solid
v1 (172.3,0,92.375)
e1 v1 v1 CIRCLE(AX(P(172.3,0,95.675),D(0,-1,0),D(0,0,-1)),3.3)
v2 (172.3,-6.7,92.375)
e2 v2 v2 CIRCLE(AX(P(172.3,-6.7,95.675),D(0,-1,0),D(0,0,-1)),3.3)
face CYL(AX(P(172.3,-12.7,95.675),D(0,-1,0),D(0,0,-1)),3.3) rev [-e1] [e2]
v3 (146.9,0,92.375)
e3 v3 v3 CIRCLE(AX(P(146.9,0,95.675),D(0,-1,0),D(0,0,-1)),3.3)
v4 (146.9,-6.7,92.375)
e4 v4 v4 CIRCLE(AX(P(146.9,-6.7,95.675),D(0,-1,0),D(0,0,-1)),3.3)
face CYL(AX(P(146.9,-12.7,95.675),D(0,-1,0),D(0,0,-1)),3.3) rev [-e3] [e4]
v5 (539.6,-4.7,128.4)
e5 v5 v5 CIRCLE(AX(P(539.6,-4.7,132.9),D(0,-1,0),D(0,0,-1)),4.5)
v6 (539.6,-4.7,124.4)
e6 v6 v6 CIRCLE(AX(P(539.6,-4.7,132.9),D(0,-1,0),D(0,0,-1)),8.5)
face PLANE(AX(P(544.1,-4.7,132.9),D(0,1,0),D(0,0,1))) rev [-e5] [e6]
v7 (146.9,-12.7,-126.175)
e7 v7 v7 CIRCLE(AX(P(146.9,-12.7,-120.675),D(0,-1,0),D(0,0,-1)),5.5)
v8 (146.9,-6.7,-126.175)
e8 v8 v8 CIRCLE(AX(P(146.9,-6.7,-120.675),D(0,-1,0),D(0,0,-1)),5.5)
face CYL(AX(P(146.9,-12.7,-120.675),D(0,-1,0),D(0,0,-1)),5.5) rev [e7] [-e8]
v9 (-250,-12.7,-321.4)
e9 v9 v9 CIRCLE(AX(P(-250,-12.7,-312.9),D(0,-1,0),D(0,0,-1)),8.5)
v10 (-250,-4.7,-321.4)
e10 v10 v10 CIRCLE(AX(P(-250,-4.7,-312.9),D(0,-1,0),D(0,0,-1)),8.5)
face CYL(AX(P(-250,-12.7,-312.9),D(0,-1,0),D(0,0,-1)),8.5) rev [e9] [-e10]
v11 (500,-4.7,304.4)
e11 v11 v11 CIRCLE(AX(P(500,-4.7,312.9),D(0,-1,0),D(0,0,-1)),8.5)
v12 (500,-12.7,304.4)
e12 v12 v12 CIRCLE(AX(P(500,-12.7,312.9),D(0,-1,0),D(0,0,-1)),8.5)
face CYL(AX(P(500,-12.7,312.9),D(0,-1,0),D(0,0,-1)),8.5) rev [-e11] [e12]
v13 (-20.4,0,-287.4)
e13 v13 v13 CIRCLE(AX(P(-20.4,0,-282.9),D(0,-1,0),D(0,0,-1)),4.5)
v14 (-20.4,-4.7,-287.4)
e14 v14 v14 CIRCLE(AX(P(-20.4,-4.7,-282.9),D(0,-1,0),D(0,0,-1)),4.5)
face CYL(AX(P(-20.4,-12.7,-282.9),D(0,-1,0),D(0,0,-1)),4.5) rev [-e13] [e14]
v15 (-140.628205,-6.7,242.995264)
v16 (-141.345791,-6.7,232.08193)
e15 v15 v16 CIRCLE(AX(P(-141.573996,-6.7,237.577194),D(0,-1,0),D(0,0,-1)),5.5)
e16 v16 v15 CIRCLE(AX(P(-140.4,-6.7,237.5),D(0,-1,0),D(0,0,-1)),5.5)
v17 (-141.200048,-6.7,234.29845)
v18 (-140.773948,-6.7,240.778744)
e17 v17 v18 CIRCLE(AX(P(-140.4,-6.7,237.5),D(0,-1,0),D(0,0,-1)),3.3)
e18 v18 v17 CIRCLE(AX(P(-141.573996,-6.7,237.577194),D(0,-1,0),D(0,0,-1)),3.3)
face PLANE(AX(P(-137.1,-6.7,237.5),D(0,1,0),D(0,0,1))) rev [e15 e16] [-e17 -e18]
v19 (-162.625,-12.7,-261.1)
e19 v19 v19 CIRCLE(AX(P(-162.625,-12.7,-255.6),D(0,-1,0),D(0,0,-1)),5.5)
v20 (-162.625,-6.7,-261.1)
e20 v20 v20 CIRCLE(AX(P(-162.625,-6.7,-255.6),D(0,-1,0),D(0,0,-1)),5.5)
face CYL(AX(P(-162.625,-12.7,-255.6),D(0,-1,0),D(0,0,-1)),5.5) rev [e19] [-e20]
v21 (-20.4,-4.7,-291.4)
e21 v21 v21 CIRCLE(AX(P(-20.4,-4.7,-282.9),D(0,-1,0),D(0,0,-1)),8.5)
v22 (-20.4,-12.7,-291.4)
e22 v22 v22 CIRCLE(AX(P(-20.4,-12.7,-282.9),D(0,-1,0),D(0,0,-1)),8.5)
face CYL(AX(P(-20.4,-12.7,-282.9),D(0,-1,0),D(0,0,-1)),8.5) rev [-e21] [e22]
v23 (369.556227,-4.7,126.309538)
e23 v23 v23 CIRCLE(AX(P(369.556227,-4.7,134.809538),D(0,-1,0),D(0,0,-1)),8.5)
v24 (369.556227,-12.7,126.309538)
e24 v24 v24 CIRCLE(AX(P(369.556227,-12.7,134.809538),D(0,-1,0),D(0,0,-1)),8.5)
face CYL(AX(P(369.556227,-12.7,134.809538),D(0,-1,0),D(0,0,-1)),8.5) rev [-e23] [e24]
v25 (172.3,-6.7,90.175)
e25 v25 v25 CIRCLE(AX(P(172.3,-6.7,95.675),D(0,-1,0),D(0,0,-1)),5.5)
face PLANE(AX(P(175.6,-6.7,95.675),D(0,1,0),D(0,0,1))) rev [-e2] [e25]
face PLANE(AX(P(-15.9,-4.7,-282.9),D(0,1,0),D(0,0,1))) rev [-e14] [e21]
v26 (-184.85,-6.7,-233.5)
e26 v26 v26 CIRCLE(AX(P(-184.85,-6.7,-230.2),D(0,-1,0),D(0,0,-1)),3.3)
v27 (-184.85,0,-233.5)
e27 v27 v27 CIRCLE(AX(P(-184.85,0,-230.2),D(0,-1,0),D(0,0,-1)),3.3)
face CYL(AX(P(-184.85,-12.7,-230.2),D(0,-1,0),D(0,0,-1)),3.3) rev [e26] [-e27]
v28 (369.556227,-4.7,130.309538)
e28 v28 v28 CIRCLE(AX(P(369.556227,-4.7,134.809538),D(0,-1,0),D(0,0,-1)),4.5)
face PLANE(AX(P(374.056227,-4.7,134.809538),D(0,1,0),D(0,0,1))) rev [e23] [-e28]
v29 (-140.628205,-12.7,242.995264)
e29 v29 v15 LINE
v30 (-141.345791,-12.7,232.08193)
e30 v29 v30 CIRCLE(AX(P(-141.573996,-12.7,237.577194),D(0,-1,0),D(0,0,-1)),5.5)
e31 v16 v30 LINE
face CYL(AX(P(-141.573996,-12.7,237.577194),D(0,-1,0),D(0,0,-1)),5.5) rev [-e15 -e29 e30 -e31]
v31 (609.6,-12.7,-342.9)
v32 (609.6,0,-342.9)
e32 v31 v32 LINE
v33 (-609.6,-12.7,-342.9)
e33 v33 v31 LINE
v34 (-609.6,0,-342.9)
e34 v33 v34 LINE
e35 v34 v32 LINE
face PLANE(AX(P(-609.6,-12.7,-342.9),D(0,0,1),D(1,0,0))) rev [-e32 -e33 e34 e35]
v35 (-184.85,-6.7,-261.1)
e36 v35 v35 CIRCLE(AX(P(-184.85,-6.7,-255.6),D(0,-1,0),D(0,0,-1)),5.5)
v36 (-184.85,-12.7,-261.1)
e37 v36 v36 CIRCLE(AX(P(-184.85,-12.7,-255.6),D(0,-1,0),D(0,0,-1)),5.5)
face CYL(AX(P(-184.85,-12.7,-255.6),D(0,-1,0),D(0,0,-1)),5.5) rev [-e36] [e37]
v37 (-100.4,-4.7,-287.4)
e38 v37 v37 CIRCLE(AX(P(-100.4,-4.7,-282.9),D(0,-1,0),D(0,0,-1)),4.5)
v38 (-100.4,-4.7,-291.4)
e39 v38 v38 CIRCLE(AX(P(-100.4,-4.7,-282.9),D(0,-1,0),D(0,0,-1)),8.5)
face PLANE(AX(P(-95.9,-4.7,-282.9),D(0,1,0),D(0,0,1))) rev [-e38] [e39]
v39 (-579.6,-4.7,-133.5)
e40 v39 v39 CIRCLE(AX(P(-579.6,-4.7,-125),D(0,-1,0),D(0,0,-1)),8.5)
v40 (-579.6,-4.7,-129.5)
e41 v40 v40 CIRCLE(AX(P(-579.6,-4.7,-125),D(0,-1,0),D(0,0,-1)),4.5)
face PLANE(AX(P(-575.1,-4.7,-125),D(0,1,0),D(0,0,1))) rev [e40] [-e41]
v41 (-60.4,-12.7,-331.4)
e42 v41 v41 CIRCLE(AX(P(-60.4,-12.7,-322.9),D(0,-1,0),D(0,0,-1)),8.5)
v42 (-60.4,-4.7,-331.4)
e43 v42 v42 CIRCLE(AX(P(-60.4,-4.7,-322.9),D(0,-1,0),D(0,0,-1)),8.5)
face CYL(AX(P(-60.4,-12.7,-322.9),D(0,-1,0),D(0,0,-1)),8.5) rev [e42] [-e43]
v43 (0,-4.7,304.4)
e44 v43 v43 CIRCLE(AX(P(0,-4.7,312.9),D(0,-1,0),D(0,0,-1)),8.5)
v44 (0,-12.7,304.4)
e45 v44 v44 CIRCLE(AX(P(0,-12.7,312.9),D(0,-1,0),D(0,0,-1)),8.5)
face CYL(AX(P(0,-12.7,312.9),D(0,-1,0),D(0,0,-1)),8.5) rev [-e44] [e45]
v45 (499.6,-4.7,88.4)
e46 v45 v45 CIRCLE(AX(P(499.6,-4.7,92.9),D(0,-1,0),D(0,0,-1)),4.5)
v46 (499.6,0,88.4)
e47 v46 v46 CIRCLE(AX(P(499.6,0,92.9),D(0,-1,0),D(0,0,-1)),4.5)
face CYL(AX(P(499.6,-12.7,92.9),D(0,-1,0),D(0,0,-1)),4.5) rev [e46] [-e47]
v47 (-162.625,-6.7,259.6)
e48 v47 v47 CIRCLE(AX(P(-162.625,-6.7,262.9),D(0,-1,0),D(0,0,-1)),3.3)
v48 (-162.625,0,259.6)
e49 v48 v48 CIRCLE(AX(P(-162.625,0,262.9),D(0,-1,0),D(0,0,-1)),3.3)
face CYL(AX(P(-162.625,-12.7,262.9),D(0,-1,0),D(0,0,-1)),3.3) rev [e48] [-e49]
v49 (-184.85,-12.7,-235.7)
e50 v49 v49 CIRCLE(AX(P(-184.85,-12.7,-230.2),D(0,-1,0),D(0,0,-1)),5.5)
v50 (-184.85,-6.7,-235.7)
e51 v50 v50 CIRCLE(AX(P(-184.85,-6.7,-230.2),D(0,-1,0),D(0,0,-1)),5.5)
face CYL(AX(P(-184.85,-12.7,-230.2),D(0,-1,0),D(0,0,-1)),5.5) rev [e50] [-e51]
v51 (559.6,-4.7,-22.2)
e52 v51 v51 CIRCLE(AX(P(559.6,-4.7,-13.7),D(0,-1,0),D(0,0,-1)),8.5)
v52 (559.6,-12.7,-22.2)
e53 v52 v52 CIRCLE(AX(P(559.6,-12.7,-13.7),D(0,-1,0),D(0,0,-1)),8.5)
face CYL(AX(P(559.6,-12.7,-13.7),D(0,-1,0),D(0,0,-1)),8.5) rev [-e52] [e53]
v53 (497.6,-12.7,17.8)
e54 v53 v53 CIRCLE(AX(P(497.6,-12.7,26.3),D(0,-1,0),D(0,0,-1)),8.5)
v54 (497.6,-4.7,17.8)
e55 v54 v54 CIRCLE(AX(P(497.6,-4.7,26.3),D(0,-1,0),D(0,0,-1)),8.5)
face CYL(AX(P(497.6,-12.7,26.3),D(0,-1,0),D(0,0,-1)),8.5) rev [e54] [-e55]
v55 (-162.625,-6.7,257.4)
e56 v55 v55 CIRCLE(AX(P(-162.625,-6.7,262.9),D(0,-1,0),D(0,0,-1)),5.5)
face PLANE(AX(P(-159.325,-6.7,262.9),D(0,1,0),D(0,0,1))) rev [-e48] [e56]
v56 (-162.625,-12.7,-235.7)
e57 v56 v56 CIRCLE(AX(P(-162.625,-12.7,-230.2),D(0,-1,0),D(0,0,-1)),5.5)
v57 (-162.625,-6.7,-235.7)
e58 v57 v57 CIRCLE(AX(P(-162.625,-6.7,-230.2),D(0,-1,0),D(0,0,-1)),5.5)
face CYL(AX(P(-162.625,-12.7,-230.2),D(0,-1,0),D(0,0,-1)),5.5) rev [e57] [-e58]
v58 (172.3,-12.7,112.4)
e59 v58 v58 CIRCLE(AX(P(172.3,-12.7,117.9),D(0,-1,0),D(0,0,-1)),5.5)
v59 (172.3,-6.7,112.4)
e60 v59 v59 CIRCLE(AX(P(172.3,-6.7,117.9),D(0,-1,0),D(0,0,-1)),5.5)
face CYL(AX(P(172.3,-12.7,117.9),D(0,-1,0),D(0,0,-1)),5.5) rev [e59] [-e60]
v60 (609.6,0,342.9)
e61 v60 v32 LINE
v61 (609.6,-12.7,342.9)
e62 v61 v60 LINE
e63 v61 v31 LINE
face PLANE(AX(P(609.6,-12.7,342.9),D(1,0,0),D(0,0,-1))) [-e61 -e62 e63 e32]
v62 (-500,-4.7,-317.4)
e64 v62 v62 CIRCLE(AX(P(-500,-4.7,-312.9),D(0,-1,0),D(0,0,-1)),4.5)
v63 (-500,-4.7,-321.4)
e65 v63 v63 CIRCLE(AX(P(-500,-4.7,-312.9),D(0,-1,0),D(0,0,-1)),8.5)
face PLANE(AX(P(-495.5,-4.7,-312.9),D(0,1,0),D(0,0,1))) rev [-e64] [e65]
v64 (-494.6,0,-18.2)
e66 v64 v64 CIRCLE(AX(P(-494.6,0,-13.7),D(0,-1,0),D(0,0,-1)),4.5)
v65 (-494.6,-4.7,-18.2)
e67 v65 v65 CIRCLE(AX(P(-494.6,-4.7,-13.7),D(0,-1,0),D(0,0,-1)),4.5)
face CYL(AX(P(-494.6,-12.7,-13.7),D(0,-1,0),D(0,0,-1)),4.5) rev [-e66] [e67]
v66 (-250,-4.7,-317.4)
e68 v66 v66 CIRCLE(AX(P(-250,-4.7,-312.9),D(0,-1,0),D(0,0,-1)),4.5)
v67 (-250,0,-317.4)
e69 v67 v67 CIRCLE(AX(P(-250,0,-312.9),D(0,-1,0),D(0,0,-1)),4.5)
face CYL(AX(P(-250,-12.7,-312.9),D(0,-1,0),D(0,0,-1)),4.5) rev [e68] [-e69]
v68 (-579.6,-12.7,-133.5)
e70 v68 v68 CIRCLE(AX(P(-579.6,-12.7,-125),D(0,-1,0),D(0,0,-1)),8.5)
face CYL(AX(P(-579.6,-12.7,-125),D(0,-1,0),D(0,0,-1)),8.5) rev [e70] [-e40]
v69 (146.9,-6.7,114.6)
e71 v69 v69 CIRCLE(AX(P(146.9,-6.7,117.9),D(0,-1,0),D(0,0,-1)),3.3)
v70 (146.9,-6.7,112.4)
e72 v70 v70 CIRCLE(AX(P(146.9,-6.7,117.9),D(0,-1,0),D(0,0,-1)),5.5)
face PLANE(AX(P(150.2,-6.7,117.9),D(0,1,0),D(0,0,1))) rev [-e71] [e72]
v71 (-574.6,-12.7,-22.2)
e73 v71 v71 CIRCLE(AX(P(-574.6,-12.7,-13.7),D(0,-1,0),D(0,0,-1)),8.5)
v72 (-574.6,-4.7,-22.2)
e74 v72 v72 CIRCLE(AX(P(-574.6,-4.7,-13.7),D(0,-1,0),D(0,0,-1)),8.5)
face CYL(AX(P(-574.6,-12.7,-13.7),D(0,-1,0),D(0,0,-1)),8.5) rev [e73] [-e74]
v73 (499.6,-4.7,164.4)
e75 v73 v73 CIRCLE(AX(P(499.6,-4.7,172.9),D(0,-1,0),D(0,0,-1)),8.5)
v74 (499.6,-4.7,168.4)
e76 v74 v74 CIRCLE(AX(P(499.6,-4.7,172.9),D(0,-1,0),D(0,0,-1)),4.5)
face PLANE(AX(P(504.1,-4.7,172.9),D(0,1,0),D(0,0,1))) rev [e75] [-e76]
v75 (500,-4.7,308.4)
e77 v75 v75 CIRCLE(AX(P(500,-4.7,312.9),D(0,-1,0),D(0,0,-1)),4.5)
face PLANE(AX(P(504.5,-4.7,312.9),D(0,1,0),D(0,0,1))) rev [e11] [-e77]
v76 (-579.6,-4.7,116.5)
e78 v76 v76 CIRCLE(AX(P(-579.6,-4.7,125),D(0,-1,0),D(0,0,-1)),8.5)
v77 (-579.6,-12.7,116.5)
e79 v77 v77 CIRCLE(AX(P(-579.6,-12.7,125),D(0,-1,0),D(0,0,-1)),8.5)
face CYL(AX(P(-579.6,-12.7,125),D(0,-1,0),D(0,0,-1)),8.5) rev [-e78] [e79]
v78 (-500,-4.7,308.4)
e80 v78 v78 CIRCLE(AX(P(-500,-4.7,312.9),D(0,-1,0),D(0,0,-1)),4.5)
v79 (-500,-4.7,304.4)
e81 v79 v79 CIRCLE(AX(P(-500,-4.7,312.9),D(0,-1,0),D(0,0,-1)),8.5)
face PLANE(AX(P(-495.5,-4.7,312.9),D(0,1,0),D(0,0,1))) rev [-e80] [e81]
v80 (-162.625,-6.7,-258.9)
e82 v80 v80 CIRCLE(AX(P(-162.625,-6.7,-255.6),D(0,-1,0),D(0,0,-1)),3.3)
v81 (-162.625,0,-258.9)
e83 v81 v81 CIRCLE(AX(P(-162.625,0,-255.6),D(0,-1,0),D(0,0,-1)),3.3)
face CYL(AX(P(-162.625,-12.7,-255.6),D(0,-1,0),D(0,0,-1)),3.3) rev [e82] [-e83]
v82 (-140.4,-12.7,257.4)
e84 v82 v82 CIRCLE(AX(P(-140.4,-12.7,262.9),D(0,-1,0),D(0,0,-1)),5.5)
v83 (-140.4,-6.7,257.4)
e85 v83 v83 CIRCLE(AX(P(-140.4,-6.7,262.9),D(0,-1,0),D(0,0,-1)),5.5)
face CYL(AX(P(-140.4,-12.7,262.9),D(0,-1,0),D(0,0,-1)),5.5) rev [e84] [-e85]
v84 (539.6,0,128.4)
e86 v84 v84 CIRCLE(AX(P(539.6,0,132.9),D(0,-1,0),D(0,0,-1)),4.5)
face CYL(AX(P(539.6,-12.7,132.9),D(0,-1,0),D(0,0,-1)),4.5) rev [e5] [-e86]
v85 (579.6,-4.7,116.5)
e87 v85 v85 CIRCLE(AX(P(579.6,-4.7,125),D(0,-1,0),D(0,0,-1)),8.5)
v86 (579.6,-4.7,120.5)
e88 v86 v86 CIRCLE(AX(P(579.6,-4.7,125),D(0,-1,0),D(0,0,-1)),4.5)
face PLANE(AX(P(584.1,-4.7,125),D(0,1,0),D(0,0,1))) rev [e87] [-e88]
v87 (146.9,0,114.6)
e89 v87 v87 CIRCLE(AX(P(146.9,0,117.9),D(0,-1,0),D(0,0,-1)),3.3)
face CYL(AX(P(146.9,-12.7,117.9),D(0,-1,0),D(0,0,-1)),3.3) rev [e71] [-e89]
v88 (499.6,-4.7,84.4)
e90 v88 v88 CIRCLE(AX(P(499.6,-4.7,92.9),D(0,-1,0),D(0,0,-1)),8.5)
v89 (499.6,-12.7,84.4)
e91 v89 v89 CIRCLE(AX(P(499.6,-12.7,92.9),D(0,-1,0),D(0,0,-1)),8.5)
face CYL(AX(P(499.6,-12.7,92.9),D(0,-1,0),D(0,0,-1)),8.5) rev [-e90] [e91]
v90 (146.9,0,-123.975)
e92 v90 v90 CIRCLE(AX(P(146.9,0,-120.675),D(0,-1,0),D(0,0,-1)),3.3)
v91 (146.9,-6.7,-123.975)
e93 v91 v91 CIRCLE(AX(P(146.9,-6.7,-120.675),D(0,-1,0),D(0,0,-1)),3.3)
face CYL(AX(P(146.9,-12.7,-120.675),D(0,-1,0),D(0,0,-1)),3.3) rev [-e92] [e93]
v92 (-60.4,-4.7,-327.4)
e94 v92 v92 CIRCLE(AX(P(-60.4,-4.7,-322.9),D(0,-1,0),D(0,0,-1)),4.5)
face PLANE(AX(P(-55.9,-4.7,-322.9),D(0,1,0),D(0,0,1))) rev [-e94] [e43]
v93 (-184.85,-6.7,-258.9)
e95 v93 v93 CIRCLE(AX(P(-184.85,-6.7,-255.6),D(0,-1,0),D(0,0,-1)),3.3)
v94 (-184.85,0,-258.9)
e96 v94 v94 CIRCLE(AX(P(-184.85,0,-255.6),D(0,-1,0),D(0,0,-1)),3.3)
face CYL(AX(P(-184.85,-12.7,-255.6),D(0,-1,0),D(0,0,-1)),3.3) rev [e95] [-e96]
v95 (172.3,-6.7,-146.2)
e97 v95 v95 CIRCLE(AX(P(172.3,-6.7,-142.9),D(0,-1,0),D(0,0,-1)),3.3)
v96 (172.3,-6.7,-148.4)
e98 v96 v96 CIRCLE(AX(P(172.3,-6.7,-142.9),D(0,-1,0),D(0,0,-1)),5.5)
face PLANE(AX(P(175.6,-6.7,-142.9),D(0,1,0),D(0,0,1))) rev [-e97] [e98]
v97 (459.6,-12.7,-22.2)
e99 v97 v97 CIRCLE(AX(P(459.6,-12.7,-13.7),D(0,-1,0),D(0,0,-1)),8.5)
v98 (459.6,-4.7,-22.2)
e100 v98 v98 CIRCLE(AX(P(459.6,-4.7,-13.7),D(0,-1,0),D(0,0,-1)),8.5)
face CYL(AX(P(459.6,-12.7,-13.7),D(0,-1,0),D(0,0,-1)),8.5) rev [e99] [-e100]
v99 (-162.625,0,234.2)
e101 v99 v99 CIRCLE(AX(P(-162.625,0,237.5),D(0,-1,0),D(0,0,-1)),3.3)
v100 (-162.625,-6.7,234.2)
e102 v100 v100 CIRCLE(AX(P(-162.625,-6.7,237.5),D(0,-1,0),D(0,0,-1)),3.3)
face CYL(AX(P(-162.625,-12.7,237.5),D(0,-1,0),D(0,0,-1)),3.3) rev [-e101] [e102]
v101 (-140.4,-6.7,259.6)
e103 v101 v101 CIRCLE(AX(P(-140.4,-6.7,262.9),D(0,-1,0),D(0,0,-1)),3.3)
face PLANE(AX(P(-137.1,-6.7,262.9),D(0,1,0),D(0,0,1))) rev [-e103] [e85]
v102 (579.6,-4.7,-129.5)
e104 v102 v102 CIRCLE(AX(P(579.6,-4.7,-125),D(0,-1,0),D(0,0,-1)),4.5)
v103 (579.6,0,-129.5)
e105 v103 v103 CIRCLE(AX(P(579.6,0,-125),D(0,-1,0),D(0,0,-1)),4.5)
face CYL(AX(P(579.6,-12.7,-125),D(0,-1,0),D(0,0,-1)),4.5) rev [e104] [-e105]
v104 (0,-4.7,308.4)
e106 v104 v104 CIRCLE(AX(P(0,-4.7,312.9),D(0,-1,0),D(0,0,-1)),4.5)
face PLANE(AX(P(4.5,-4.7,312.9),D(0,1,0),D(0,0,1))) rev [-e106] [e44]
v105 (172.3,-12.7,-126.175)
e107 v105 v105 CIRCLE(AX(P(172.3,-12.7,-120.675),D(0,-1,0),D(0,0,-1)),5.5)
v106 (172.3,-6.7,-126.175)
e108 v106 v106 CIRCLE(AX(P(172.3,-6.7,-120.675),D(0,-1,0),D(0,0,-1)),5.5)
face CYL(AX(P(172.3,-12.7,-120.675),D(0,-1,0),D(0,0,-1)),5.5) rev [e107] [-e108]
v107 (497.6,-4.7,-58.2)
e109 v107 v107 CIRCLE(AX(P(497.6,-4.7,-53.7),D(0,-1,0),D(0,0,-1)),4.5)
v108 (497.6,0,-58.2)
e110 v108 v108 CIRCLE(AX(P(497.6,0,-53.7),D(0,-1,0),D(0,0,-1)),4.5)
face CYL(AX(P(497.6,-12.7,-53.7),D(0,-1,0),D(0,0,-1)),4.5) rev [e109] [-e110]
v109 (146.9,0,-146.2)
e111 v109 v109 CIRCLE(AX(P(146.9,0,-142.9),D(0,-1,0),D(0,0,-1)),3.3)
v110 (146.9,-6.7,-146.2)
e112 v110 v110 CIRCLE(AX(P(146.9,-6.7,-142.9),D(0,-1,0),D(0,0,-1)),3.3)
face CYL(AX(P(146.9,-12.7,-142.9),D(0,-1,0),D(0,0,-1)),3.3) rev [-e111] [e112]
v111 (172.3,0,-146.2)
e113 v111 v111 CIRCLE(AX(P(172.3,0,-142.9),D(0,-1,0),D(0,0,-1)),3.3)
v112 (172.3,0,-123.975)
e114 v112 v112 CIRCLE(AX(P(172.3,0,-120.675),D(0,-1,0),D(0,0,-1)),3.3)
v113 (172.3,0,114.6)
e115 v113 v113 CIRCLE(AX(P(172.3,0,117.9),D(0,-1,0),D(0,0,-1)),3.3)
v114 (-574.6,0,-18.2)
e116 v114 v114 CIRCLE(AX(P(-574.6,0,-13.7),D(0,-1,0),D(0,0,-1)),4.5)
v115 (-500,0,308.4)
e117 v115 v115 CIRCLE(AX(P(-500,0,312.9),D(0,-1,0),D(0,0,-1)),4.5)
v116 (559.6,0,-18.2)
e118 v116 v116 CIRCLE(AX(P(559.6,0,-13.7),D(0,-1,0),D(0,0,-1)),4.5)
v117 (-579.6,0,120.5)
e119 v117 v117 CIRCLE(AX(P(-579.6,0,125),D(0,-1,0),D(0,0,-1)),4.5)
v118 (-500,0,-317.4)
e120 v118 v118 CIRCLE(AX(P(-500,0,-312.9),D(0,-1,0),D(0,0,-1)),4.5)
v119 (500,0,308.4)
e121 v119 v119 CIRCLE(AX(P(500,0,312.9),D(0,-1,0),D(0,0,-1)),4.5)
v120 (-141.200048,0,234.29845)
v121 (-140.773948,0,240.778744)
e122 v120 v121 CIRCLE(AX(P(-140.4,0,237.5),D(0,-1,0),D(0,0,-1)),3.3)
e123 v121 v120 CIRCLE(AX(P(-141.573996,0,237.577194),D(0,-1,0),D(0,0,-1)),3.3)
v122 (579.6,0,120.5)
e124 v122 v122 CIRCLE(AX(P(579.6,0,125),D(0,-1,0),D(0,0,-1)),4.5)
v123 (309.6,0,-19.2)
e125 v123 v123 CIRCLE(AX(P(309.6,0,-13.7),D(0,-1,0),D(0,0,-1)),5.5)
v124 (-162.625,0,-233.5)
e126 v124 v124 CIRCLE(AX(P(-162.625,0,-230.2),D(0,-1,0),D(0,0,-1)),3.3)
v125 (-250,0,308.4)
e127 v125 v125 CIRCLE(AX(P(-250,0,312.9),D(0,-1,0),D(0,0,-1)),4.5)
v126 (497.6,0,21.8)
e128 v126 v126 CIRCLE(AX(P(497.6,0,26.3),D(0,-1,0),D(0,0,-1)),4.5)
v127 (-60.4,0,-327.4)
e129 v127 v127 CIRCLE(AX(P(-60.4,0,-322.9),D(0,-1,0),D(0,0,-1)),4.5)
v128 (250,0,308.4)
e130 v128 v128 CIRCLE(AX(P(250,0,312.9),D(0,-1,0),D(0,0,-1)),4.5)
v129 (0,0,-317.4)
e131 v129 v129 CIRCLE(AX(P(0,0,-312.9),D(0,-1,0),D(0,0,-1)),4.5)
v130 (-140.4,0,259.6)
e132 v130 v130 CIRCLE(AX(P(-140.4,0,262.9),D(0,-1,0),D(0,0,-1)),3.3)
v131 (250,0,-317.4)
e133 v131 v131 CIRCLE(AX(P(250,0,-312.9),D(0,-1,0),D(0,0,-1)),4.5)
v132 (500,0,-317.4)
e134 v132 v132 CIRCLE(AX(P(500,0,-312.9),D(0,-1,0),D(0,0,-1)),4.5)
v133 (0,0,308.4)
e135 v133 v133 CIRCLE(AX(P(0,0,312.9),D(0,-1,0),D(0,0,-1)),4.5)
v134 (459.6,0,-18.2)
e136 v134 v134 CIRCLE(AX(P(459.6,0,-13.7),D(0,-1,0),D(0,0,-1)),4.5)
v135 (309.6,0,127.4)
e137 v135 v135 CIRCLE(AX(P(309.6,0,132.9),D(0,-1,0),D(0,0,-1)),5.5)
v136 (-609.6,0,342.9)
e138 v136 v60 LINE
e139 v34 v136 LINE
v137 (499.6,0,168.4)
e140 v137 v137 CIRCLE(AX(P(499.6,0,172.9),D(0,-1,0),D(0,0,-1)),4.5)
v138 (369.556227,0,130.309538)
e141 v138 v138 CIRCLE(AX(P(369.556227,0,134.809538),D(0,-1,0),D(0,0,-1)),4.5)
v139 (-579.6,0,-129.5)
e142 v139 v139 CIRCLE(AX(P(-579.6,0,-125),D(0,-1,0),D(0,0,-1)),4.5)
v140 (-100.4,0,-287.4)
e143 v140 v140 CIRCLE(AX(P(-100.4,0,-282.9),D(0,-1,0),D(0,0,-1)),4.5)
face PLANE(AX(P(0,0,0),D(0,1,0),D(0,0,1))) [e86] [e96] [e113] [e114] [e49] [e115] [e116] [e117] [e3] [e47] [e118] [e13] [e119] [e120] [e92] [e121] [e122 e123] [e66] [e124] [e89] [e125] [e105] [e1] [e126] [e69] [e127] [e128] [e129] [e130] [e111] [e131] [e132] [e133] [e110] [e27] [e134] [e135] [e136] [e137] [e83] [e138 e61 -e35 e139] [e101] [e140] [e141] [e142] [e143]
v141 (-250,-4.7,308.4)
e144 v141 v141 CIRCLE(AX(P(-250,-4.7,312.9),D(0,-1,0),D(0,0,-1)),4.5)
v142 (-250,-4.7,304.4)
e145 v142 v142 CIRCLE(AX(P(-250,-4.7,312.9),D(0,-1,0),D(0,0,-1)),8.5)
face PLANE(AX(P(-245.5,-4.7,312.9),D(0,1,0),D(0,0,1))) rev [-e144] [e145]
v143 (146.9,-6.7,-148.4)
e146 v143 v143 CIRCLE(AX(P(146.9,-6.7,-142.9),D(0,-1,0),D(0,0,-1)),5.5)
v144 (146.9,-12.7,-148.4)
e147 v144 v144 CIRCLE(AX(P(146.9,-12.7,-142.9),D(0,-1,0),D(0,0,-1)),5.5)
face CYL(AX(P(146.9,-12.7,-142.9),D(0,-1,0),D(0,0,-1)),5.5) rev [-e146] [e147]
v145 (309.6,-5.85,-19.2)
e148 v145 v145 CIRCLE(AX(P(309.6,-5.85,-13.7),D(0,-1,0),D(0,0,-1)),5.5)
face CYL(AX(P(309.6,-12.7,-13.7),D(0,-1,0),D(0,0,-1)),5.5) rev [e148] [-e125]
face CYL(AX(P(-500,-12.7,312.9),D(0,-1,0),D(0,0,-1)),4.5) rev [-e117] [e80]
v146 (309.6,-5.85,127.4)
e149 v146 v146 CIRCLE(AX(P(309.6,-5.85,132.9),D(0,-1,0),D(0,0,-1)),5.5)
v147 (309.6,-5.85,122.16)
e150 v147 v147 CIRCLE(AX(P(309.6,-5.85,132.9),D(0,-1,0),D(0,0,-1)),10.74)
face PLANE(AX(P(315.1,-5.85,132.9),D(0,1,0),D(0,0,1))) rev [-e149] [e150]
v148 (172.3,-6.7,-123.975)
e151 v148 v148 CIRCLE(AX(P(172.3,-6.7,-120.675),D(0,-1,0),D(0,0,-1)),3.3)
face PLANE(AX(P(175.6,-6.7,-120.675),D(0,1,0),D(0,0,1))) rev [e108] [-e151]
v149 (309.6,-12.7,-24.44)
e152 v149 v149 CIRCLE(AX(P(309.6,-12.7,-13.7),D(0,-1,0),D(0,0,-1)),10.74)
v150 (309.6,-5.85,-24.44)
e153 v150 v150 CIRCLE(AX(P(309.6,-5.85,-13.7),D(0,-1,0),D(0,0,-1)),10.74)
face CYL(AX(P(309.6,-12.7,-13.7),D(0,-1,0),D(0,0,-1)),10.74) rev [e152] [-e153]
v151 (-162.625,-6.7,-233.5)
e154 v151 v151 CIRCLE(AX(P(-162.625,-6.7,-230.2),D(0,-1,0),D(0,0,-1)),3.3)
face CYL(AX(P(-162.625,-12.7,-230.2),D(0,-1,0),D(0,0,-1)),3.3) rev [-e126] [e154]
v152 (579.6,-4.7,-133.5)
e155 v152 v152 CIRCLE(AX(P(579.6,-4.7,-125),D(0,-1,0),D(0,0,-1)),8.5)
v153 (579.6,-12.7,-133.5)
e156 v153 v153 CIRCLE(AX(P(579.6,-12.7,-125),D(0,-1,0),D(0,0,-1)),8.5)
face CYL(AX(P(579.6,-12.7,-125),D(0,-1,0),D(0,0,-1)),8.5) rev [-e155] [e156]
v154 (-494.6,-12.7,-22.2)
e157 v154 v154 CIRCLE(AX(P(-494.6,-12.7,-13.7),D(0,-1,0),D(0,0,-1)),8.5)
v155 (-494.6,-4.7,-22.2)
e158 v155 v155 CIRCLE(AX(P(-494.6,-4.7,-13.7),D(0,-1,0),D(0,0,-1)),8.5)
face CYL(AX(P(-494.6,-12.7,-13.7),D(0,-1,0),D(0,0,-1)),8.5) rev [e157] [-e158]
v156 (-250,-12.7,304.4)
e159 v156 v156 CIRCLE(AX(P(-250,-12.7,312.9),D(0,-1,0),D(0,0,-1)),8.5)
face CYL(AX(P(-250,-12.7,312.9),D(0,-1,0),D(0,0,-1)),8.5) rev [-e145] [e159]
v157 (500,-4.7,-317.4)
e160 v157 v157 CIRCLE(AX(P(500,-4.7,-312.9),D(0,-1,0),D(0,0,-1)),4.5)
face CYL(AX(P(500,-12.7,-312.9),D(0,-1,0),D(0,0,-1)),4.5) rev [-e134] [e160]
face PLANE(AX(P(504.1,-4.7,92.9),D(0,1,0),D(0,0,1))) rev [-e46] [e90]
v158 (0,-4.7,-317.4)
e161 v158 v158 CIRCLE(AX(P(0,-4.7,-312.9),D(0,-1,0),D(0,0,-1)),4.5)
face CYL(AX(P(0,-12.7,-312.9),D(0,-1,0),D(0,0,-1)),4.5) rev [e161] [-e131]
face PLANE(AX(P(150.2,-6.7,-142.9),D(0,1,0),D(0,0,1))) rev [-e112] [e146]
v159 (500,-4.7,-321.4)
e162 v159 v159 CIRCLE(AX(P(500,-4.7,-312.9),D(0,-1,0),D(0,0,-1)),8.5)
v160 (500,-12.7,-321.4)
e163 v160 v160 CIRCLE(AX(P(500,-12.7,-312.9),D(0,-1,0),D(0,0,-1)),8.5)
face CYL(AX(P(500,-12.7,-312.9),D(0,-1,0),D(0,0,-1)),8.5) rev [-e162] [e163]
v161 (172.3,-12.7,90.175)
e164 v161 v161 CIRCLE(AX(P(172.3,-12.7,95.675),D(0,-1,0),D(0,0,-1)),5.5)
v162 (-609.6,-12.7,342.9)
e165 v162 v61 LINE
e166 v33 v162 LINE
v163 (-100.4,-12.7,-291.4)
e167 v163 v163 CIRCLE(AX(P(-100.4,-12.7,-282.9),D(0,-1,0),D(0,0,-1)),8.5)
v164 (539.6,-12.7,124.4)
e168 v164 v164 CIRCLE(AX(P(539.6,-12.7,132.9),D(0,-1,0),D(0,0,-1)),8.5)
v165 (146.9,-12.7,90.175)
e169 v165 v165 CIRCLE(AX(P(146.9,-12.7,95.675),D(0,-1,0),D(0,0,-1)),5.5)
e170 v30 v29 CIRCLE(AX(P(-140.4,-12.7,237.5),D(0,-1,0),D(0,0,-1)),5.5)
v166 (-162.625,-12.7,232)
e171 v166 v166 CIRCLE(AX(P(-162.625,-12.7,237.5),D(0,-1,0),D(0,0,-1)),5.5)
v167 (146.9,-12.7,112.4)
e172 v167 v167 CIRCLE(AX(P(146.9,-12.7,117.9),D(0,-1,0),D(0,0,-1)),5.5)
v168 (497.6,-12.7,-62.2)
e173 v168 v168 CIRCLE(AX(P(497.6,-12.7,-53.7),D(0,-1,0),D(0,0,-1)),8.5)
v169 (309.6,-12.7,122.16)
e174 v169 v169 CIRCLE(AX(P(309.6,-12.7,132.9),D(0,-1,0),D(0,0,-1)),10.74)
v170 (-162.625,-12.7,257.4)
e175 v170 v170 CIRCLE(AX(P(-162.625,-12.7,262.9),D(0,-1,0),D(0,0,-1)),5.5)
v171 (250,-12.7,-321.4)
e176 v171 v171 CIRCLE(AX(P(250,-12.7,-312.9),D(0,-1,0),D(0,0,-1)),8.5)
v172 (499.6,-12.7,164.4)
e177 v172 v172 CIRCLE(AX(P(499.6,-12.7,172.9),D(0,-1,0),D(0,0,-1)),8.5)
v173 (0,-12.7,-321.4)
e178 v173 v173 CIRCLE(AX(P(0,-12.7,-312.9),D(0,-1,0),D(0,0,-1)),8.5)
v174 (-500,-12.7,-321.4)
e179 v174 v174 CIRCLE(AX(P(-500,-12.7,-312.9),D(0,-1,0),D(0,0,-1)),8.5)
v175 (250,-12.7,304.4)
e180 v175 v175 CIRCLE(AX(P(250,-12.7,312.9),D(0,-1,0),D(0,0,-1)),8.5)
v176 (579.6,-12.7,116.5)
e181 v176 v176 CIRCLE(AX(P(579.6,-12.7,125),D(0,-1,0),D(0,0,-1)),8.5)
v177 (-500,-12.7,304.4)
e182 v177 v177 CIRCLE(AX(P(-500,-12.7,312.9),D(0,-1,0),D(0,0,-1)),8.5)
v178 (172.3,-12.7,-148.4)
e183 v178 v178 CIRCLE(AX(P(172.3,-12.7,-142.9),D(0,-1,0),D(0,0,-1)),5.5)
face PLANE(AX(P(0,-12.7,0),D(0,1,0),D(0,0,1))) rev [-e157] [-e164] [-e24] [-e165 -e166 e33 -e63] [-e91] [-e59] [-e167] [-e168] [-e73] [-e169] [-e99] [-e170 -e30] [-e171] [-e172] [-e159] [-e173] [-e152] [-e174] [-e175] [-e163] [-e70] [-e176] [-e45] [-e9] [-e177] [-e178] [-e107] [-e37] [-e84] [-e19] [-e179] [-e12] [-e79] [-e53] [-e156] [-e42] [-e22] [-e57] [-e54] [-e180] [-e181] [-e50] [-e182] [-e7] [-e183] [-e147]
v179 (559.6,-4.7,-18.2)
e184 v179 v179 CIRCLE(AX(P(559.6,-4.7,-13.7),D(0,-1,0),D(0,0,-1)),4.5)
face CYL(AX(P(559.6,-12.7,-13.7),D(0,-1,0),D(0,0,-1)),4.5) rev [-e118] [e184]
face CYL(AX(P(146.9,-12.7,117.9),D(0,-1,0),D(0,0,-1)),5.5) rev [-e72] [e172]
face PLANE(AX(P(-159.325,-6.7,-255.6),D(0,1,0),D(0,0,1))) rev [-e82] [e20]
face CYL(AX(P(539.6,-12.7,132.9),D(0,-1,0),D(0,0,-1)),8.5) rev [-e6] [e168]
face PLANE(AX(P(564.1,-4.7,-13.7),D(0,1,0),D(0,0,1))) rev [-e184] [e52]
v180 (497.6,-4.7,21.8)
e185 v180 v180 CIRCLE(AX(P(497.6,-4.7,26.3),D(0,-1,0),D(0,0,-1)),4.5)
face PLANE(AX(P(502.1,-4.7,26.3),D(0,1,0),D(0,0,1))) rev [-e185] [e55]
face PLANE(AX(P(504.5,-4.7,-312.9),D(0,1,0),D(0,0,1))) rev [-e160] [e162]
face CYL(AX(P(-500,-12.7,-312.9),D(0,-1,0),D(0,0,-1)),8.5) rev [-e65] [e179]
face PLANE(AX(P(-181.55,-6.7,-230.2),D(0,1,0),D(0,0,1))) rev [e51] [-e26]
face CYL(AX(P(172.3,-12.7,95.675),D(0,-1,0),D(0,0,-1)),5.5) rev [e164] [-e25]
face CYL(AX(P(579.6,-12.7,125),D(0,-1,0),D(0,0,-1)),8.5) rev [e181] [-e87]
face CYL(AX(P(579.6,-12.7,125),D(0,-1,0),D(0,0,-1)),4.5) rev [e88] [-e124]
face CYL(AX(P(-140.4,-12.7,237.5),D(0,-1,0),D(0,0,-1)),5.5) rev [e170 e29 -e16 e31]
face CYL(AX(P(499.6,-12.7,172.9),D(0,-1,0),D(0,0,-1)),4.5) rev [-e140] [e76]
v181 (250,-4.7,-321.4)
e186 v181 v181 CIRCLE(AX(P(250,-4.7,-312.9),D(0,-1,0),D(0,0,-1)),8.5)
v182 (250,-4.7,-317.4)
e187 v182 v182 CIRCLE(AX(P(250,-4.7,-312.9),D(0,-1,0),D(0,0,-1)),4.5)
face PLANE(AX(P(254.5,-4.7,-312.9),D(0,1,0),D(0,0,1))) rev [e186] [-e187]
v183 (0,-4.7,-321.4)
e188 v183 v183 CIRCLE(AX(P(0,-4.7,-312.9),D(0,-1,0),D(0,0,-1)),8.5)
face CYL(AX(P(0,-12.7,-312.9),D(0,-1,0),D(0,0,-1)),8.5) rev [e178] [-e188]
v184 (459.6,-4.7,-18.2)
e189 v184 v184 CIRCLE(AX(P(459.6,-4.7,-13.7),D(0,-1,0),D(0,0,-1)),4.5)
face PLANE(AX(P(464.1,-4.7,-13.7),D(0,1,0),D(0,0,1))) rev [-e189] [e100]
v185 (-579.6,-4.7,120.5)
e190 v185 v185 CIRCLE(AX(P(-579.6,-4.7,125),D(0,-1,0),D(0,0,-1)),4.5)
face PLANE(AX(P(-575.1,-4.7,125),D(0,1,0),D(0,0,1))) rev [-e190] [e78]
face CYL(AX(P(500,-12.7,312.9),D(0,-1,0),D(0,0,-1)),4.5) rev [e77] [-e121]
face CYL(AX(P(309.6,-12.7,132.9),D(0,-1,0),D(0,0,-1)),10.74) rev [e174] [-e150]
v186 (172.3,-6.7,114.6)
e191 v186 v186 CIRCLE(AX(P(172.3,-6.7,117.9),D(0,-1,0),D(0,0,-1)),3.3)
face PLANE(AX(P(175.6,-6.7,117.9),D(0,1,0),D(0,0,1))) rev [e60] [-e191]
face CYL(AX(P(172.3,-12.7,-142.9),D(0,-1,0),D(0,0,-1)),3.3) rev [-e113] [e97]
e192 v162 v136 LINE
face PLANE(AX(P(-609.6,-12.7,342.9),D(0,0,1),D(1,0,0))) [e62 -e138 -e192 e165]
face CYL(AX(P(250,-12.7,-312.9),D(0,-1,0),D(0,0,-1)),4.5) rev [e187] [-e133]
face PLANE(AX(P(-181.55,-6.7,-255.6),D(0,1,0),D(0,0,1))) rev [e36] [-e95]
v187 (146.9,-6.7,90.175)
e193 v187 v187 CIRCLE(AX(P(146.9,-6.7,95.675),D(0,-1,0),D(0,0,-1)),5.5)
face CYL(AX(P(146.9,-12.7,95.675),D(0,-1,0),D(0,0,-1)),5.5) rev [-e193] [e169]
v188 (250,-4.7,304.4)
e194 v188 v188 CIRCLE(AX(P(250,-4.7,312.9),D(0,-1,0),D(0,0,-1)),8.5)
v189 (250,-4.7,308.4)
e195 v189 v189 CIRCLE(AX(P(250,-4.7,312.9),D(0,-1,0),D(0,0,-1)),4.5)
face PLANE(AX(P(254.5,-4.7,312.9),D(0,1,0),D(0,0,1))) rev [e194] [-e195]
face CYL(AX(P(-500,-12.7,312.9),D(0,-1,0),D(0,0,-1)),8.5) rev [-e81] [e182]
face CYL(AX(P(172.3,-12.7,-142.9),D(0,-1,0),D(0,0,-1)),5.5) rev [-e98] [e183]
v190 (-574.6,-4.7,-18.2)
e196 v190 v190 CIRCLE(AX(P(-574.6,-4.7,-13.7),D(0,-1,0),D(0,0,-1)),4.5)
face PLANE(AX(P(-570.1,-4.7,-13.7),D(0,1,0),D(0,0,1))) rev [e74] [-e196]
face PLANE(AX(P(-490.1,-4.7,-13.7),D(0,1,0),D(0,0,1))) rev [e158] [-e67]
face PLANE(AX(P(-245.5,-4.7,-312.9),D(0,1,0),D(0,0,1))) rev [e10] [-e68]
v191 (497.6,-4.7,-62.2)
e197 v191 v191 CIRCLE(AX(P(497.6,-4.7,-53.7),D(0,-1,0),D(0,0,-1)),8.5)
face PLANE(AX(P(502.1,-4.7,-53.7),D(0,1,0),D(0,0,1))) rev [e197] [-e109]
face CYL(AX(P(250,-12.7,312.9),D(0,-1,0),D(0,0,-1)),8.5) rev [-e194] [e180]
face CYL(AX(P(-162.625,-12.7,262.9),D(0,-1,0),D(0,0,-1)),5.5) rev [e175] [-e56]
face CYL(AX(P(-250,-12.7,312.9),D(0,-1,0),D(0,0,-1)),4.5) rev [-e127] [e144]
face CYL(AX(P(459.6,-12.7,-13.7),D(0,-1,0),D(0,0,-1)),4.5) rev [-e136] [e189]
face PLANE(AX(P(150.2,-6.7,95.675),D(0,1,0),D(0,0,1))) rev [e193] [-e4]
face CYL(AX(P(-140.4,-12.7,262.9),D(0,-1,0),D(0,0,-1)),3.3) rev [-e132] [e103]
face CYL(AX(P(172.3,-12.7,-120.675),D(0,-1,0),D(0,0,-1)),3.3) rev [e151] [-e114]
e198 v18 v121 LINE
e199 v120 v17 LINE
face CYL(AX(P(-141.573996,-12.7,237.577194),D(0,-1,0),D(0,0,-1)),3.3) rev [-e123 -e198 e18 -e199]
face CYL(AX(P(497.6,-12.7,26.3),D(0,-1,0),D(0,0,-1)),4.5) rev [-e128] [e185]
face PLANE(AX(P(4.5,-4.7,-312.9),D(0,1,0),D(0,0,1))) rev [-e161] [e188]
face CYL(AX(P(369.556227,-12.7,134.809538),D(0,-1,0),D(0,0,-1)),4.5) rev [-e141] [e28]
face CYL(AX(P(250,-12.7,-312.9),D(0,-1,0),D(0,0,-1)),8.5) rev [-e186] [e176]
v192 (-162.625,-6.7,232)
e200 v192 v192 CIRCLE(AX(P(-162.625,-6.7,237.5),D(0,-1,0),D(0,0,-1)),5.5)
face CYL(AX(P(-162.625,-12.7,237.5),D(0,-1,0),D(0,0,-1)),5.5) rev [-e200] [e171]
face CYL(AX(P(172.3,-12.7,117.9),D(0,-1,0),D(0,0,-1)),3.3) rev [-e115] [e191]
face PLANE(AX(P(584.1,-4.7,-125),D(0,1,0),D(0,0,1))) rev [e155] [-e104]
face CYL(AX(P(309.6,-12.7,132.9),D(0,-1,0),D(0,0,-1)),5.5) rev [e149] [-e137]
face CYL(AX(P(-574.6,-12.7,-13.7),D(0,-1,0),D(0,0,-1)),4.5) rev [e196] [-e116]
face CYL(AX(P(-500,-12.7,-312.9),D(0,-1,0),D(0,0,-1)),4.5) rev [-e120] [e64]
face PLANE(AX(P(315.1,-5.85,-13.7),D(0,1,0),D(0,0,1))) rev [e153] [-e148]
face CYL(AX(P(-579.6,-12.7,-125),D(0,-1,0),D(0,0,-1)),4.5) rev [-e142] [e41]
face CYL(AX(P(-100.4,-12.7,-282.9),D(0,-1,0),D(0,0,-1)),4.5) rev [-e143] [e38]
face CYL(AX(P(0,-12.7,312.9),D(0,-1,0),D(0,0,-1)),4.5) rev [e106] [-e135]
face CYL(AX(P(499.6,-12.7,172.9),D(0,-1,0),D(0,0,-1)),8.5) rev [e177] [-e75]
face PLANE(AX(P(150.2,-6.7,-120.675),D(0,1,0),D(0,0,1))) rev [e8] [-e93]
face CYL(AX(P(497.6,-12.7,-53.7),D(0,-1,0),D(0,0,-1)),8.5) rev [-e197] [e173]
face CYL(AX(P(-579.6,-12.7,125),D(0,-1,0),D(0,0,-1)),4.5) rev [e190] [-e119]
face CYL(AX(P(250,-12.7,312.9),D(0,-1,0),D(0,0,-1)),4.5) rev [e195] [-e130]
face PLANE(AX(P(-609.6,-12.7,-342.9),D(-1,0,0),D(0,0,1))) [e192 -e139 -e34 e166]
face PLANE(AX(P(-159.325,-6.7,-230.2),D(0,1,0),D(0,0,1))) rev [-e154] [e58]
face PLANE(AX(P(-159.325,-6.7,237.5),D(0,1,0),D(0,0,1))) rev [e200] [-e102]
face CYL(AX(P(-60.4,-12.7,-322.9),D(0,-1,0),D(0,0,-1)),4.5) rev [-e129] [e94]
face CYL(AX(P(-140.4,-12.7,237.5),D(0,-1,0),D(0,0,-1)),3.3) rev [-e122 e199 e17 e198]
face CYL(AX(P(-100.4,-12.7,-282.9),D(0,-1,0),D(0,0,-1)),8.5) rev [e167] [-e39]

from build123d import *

# Parameters (mm, degrees)
BASE_FLANGE1_START                       = -12.7
BASE_FLANGE1_OUTLINE_W                   = 1219.2
BASE_FLANGE1_OUTLINE_H                   = 685.8
BASE_FLANGE1_DEPTH                       = 12.7
CBORE_FOR_M8_SHCS1_D                     = 9
CBORE_FOR_M8_SHCS1_CBORE_D               = 17
CBORE_FOR_M8_SHCS1_CBORE_DEPTH           = 8
CBORE_FOR_M6_SHCS1_D                     = 6.6
CBORE_FOR_M6_SHCS1_CBORE_D               = 11
CBORE_FOR_M6_SHCS1_CBORE_DEPTH           = 6
CBORE_FOR_M10_HEX_HEAD_BOLT1_D           = 11
CBORE_FOR_M10_HEX_HEAD_BOLT1_CBORE_D     = 21.48
CBORE_FOR_M10_HEX_HEAD_BOLT1_CBORE_DEPTH = 6.85


# Read off the part's stored shape, not the designer's step: Base-Flange1
with BuildPart() as part:
    # Base-Flange1 outline → Base-Flange1 (new body)
    with BuildSketch(Plane(origin=(0, 0, 0), x_dir=(1, 0, 0), z_dir=(0, 1, 0)).offset(BASE_FLANGE1_START)):
        Rectangle(BASE_FLANGE1_OUTLINE_W, BASE_FLANGE1_OUTLINE_H)
    extrude(amount=BASE_FLANGE1_DEPTH)

    # CBORE for M8 SHCS1 (through all)
    with Locations(Plane(origin=(0, -12.7, 0), x_dir=(-1, 0, 0), z_dir=(0, -1, 0))):
        with Locations((-499.6, -92.9), (0, 312.9), (-250, 312.9), (-500, 312.9), (500, 312.9), (250, 312.9), (500, -312.9), (250, -312.9), (0, -312.9), (-250, -312.9), (-500, -312.9), (-579.6, 125), (-579.6, -125), (579.6, -125), (579.6, 125), (-459.6, 13.7), (-559.6, 13.7), (-539.6, -132.9), (574.6, 13.7), (494.6, 13.7), (100.4, 282.9), (20.4, 282.9), (60.4, 322.9), (-497.6, -26.3), (-497.6, 53.7), (-369.556226637, -134.809538036), (-499.6, -172.9)):
            CounterBoreHole(CBORE_FOR_M8_SHCS1_D / 2, CBORE_FOR_M8_SHCS1_CBORE_D / 2, CBORE_FOR_M8_SHCS1_CBORE_DEPTH)

    # CBORE for M6 SHCS1 (through all)
    with Locations(Plane(origin=(0, -12.7, 0), x_dir=(-1, 0, 0), z_dir=(0, -1, 0))):
        with Locations((184.85, 255.6), (184.85, 230.2), (162.625, 230.2), (162.625, 255.6), (162.625, -237.5), (162.625, -262.9), (141.573996145, -237.577193976), (140.4, -237.5), (140.4, -262.9), (-146.9, -117.9), (-172.3, -117.9), (-172.3, -95.675), (-146.9, -95.675), (-146.9, 120.675), (-172.3, 120.675), (-172.3, 142.9), (-146.9, 142.9)):
            CounterBoreHole(CBORE_FOR_M6_SHCS1_D / 2, CBORE_FOR_M6_SHCS1_CBORE_D / 2, CBORE_FOR_M6_SHCS1_CBORE_DEPTH)

    # CBORE for M10 Hex Head Bolt1 (through all)
    with Locations(Plane(origin=(0, -12.7, 0), x_dir=(-1, 0, 0), z_dir=(0, -1, 0))):
        with Locations((-309.6, 13.7), (-309.6, -132.9)):
            CounterBoreHole(CBORE_FOR_M10_HEX_HEAD_BOLT1_D / 2, CBORE_FOR_M10_HEX_HEAD_BOLT1_CBORE_D / 2, CBORE_FOR_M10_HEX_HEAD_BOLT1_CBORE_DEPTH)


solid = part.part
